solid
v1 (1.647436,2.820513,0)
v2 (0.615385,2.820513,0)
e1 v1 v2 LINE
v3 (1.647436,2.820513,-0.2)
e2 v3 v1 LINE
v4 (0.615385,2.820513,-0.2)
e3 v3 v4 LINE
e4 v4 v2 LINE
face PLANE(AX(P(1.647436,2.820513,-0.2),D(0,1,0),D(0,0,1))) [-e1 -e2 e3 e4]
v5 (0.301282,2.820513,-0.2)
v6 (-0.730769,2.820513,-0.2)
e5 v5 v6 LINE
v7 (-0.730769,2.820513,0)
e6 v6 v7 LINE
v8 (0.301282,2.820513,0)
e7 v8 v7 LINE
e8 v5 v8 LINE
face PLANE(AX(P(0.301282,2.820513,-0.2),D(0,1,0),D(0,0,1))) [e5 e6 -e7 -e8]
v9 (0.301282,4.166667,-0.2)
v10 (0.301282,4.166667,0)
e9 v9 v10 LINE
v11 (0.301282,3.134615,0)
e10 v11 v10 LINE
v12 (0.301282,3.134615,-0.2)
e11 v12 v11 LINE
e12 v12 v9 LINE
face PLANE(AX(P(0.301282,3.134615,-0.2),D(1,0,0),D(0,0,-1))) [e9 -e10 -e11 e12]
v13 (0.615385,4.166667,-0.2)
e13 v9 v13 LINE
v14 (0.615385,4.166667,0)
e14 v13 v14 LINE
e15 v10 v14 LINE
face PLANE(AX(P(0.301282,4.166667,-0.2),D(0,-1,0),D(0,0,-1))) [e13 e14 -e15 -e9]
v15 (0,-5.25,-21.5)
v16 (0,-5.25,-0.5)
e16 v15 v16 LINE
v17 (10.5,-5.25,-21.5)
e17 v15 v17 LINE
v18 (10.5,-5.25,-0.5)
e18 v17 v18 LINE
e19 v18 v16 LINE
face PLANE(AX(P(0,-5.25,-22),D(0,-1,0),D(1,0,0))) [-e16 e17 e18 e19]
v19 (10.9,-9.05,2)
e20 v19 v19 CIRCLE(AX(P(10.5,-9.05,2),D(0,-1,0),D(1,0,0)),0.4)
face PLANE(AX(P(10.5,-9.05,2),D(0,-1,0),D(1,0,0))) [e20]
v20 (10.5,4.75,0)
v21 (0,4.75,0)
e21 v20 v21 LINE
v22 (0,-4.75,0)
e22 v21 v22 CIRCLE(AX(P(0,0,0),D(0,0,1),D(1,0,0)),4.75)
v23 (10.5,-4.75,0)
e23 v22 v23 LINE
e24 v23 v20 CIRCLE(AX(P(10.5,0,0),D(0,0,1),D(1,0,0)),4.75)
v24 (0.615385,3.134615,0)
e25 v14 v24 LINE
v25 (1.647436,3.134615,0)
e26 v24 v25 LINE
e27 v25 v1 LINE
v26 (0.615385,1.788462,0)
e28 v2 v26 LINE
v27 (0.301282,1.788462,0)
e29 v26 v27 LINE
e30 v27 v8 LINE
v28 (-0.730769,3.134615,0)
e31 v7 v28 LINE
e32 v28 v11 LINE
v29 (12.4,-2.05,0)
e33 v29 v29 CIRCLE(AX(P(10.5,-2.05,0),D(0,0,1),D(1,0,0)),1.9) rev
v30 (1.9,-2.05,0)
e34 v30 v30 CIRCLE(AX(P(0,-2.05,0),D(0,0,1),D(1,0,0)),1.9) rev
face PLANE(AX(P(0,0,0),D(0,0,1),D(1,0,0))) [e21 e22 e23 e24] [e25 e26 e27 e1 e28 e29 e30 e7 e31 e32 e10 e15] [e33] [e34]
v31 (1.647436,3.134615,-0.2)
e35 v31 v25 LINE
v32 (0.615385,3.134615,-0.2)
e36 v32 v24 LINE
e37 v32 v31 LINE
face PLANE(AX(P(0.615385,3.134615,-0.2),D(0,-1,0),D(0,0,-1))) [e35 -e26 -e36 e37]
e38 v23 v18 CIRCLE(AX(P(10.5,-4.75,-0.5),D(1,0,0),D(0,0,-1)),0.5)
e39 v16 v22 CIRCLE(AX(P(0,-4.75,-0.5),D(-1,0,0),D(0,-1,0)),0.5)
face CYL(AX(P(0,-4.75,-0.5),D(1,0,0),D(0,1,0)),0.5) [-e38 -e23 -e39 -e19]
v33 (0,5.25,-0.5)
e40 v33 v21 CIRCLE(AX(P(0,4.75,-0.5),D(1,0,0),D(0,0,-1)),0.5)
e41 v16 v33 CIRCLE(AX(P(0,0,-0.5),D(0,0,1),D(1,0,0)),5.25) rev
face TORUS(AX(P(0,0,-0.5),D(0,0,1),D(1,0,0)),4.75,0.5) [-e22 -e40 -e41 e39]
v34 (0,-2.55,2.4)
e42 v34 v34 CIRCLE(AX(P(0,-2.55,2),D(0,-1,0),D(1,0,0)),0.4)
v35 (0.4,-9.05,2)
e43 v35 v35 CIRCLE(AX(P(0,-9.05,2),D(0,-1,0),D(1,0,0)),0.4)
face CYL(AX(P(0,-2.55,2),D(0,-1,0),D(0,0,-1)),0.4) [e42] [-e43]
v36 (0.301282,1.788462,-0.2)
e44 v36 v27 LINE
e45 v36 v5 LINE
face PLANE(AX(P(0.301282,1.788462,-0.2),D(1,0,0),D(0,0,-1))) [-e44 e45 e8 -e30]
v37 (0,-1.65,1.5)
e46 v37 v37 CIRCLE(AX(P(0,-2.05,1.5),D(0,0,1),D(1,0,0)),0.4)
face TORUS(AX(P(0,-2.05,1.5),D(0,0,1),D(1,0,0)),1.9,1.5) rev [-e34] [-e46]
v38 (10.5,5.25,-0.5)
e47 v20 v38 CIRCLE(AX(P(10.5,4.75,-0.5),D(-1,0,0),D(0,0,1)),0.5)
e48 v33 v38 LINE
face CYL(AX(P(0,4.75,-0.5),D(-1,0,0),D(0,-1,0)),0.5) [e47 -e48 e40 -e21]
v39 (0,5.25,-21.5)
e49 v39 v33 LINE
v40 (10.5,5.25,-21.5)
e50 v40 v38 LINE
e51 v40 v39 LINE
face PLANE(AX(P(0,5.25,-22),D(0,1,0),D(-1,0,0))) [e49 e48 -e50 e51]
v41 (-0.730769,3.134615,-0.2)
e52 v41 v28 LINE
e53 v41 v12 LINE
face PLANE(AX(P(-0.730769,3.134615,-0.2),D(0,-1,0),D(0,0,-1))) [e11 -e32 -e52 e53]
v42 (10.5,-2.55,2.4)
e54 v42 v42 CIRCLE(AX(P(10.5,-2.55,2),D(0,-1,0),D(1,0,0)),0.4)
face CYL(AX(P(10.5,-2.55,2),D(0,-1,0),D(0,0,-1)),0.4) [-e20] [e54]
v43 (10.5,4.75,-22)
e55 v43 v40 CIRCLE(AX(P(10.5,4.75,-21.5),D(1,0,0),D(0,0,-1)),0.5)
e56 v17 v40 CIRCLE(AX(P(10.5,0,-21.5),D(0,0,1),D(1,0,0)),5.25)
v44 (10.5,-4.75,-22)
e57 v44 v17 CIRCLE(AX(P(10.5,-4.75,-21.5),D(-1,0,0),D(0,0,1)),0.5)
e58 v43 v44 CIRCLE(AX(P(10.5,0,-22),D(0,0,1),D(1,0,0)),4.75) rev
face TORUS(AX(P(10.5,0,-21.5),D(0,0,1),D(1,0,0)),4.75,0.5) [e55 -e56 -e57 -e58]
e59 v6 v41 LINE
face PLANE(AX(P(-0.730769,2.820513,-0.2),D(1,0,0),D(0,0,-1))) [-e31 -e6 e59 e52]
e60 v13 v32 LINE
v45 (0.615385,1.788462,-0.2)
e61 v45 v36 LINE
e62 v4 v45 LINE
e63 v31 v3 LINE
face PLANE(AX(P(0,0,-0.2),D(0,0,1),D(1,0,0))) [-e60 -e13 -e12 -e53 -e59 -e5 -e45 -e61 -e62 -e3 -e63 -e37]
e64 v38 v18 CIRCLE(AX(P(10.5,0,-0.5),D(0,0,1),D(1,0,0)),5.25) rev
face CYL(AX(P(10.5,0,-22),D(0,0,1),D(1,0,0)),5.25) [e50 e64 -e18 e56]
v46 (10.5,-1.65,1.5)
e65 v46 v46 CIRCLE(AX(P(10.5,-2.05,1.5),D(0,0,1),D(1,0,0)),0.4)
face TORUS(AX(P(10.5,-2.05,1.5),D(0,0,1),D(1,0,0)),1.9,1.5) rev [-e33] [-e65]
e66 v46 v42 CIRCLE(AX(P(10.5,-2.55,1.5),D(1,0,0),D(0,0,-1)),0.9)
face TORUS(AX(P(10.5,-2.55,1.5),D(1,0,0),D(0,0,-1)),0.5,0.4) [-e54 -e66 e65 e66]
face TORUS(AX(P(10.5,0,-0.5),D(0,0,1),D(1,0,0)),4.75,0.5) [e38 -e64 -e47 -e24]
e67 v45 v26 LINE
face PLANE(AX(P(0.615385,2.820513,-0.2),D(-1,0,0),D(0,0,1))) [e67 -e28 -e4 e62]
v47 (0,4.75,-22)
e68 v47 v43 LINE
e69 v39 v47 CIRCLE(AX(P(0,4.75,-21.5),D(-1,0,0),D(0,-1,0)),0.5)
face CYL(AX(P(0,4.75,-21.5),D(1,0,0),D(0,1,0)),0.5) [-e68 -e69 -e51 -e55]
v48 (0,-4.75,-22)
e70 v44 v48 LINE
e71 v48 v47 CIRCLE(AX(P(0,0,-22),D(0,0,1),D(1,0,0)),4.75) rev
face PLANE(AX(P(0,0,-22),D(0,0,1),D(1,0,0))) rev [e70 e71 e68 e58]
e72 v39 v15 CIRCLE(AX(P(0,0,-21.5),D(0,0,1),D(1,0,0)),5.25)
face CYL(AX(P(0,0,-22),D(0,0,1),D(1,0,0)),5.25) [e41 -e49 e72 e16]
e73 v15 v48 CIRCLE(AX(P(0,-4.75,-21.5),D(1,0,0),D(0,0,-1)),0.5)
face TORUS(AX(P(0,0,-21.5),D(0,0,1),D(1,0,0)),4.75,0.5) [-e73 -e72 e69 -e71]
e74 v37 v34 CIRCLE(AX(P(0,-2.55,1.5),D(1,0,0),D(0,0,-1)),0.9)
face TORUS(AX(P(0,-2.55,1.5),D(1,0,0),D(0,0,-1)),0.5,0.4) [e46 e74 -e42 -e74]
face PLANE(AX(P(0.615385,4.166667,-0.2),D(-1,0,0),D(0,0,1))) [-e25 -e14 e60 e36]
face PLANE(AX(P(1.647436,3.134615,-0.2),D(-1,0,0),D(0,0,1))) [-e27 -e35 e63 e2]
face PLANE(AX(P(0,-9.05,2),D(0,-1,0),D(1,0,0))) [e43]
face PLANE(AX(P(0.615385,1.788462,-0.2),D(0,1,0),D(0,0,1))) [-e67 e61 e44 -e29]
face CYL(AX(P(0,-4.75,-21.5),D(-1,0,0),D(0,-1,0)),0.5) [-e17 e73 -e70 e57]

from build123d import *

# Parameters (mm, degrees)
BOSS_EXTRUDE1_DEPTH = 22
SKETCH2_R           = 0.4
FILLET1_R           = 1.5
FILLET2_R           = 0.5
CUT_EXTRUDE1_DEPTH  = 0.2


with BuildPart() as part:
    # Sketch1 → Boss-Extrude1 (new body)
    with BuildSketch(Plane.XY):
        with BuildLine():
            Line((0, 5.25), (10.5, 5.25))
            ThreePointArc((10.5, 5.25), (15.75, 0), (10.5, -5.25))
            Line((10.5, -5.25), (0, -5.25))
            ThreePointArc((0, -5.25), (-5.25, 0), (0, 5.25))
        make_face()
    extrude(amount=-BOSS_EXTRUDE1_DEPTH)

    # Sweep1: sweep along a path in Sketch3
    with BuildLine(Plane.YZ) as sweep1_path:
        Line((-2.05, 0), (-2.05, 1.5))
        ThreePointArc((-2.05, 1.5), (-2.196446609, 1.853553391), (-2.55, 2))
        Line((-2.55, 2), (-9.05, 2))
    # Sketch2 → Sweep1 (sweep)
    with BuildSketch(Plane.XY):
        with Locations((0, -2.05)):
            Circle(SKETCH2_R)
        with Locations((10.5, -2.05)):
            Circle(SKETCH2_R)
    sweep(path=sweep1_path.line)

    # Fillet1
    fillet1_edges = [part.edges().sort_by_distance(p)[0] for p in [
        (-0.4, -2.05, 0),
        (10.1, -2.05, 0),
    ]]
    fillet(fillet1_edges, radius=FILLET1_R - 0.0001)  # a hair under: the kernel refuses the full size

    # Fillet2
    fillet2_edges = [part.edges().sort_by_distance(p)[0] for p in [
        (15.75, 0, -22),
        (5.25, 5.25, -22),
        (-5.25, 0, -22),
        (5.25, 5.25, 0),
        (15.75, 0, 0),
        (5.25, -5.25, 0),
        (-5.25, 0, 0),
        (5.25, -5.25, -22),
    ]]
    fillet(fillet2_edges, radius=FILLET2_R)

    # Sketch4 → Cut-Extrude1 (cut)
    with BuildSketch(Plane.XY):
        Polygon((0.301282051, 3.134615385), (0.301282051, 4.166666667), (0.615384615, 4.166666667), (0.615384615, 3.134615385), (1.647435897, 3.134615385), (1.647435897, 2.820512821), (0.615384615, 2.820512821), (0.615384615, 1.788461538), (0.301282051, 1.788461538), (0.301282051, 2.820512821), (-0.730769231, 2.820512821), (-0.730769231, 3.134615385), align=None)
    extrude(amount=-CUT_EXTRUDE1_DEPTH, mode=Mode.SUBTRACT)


solid = part.part
